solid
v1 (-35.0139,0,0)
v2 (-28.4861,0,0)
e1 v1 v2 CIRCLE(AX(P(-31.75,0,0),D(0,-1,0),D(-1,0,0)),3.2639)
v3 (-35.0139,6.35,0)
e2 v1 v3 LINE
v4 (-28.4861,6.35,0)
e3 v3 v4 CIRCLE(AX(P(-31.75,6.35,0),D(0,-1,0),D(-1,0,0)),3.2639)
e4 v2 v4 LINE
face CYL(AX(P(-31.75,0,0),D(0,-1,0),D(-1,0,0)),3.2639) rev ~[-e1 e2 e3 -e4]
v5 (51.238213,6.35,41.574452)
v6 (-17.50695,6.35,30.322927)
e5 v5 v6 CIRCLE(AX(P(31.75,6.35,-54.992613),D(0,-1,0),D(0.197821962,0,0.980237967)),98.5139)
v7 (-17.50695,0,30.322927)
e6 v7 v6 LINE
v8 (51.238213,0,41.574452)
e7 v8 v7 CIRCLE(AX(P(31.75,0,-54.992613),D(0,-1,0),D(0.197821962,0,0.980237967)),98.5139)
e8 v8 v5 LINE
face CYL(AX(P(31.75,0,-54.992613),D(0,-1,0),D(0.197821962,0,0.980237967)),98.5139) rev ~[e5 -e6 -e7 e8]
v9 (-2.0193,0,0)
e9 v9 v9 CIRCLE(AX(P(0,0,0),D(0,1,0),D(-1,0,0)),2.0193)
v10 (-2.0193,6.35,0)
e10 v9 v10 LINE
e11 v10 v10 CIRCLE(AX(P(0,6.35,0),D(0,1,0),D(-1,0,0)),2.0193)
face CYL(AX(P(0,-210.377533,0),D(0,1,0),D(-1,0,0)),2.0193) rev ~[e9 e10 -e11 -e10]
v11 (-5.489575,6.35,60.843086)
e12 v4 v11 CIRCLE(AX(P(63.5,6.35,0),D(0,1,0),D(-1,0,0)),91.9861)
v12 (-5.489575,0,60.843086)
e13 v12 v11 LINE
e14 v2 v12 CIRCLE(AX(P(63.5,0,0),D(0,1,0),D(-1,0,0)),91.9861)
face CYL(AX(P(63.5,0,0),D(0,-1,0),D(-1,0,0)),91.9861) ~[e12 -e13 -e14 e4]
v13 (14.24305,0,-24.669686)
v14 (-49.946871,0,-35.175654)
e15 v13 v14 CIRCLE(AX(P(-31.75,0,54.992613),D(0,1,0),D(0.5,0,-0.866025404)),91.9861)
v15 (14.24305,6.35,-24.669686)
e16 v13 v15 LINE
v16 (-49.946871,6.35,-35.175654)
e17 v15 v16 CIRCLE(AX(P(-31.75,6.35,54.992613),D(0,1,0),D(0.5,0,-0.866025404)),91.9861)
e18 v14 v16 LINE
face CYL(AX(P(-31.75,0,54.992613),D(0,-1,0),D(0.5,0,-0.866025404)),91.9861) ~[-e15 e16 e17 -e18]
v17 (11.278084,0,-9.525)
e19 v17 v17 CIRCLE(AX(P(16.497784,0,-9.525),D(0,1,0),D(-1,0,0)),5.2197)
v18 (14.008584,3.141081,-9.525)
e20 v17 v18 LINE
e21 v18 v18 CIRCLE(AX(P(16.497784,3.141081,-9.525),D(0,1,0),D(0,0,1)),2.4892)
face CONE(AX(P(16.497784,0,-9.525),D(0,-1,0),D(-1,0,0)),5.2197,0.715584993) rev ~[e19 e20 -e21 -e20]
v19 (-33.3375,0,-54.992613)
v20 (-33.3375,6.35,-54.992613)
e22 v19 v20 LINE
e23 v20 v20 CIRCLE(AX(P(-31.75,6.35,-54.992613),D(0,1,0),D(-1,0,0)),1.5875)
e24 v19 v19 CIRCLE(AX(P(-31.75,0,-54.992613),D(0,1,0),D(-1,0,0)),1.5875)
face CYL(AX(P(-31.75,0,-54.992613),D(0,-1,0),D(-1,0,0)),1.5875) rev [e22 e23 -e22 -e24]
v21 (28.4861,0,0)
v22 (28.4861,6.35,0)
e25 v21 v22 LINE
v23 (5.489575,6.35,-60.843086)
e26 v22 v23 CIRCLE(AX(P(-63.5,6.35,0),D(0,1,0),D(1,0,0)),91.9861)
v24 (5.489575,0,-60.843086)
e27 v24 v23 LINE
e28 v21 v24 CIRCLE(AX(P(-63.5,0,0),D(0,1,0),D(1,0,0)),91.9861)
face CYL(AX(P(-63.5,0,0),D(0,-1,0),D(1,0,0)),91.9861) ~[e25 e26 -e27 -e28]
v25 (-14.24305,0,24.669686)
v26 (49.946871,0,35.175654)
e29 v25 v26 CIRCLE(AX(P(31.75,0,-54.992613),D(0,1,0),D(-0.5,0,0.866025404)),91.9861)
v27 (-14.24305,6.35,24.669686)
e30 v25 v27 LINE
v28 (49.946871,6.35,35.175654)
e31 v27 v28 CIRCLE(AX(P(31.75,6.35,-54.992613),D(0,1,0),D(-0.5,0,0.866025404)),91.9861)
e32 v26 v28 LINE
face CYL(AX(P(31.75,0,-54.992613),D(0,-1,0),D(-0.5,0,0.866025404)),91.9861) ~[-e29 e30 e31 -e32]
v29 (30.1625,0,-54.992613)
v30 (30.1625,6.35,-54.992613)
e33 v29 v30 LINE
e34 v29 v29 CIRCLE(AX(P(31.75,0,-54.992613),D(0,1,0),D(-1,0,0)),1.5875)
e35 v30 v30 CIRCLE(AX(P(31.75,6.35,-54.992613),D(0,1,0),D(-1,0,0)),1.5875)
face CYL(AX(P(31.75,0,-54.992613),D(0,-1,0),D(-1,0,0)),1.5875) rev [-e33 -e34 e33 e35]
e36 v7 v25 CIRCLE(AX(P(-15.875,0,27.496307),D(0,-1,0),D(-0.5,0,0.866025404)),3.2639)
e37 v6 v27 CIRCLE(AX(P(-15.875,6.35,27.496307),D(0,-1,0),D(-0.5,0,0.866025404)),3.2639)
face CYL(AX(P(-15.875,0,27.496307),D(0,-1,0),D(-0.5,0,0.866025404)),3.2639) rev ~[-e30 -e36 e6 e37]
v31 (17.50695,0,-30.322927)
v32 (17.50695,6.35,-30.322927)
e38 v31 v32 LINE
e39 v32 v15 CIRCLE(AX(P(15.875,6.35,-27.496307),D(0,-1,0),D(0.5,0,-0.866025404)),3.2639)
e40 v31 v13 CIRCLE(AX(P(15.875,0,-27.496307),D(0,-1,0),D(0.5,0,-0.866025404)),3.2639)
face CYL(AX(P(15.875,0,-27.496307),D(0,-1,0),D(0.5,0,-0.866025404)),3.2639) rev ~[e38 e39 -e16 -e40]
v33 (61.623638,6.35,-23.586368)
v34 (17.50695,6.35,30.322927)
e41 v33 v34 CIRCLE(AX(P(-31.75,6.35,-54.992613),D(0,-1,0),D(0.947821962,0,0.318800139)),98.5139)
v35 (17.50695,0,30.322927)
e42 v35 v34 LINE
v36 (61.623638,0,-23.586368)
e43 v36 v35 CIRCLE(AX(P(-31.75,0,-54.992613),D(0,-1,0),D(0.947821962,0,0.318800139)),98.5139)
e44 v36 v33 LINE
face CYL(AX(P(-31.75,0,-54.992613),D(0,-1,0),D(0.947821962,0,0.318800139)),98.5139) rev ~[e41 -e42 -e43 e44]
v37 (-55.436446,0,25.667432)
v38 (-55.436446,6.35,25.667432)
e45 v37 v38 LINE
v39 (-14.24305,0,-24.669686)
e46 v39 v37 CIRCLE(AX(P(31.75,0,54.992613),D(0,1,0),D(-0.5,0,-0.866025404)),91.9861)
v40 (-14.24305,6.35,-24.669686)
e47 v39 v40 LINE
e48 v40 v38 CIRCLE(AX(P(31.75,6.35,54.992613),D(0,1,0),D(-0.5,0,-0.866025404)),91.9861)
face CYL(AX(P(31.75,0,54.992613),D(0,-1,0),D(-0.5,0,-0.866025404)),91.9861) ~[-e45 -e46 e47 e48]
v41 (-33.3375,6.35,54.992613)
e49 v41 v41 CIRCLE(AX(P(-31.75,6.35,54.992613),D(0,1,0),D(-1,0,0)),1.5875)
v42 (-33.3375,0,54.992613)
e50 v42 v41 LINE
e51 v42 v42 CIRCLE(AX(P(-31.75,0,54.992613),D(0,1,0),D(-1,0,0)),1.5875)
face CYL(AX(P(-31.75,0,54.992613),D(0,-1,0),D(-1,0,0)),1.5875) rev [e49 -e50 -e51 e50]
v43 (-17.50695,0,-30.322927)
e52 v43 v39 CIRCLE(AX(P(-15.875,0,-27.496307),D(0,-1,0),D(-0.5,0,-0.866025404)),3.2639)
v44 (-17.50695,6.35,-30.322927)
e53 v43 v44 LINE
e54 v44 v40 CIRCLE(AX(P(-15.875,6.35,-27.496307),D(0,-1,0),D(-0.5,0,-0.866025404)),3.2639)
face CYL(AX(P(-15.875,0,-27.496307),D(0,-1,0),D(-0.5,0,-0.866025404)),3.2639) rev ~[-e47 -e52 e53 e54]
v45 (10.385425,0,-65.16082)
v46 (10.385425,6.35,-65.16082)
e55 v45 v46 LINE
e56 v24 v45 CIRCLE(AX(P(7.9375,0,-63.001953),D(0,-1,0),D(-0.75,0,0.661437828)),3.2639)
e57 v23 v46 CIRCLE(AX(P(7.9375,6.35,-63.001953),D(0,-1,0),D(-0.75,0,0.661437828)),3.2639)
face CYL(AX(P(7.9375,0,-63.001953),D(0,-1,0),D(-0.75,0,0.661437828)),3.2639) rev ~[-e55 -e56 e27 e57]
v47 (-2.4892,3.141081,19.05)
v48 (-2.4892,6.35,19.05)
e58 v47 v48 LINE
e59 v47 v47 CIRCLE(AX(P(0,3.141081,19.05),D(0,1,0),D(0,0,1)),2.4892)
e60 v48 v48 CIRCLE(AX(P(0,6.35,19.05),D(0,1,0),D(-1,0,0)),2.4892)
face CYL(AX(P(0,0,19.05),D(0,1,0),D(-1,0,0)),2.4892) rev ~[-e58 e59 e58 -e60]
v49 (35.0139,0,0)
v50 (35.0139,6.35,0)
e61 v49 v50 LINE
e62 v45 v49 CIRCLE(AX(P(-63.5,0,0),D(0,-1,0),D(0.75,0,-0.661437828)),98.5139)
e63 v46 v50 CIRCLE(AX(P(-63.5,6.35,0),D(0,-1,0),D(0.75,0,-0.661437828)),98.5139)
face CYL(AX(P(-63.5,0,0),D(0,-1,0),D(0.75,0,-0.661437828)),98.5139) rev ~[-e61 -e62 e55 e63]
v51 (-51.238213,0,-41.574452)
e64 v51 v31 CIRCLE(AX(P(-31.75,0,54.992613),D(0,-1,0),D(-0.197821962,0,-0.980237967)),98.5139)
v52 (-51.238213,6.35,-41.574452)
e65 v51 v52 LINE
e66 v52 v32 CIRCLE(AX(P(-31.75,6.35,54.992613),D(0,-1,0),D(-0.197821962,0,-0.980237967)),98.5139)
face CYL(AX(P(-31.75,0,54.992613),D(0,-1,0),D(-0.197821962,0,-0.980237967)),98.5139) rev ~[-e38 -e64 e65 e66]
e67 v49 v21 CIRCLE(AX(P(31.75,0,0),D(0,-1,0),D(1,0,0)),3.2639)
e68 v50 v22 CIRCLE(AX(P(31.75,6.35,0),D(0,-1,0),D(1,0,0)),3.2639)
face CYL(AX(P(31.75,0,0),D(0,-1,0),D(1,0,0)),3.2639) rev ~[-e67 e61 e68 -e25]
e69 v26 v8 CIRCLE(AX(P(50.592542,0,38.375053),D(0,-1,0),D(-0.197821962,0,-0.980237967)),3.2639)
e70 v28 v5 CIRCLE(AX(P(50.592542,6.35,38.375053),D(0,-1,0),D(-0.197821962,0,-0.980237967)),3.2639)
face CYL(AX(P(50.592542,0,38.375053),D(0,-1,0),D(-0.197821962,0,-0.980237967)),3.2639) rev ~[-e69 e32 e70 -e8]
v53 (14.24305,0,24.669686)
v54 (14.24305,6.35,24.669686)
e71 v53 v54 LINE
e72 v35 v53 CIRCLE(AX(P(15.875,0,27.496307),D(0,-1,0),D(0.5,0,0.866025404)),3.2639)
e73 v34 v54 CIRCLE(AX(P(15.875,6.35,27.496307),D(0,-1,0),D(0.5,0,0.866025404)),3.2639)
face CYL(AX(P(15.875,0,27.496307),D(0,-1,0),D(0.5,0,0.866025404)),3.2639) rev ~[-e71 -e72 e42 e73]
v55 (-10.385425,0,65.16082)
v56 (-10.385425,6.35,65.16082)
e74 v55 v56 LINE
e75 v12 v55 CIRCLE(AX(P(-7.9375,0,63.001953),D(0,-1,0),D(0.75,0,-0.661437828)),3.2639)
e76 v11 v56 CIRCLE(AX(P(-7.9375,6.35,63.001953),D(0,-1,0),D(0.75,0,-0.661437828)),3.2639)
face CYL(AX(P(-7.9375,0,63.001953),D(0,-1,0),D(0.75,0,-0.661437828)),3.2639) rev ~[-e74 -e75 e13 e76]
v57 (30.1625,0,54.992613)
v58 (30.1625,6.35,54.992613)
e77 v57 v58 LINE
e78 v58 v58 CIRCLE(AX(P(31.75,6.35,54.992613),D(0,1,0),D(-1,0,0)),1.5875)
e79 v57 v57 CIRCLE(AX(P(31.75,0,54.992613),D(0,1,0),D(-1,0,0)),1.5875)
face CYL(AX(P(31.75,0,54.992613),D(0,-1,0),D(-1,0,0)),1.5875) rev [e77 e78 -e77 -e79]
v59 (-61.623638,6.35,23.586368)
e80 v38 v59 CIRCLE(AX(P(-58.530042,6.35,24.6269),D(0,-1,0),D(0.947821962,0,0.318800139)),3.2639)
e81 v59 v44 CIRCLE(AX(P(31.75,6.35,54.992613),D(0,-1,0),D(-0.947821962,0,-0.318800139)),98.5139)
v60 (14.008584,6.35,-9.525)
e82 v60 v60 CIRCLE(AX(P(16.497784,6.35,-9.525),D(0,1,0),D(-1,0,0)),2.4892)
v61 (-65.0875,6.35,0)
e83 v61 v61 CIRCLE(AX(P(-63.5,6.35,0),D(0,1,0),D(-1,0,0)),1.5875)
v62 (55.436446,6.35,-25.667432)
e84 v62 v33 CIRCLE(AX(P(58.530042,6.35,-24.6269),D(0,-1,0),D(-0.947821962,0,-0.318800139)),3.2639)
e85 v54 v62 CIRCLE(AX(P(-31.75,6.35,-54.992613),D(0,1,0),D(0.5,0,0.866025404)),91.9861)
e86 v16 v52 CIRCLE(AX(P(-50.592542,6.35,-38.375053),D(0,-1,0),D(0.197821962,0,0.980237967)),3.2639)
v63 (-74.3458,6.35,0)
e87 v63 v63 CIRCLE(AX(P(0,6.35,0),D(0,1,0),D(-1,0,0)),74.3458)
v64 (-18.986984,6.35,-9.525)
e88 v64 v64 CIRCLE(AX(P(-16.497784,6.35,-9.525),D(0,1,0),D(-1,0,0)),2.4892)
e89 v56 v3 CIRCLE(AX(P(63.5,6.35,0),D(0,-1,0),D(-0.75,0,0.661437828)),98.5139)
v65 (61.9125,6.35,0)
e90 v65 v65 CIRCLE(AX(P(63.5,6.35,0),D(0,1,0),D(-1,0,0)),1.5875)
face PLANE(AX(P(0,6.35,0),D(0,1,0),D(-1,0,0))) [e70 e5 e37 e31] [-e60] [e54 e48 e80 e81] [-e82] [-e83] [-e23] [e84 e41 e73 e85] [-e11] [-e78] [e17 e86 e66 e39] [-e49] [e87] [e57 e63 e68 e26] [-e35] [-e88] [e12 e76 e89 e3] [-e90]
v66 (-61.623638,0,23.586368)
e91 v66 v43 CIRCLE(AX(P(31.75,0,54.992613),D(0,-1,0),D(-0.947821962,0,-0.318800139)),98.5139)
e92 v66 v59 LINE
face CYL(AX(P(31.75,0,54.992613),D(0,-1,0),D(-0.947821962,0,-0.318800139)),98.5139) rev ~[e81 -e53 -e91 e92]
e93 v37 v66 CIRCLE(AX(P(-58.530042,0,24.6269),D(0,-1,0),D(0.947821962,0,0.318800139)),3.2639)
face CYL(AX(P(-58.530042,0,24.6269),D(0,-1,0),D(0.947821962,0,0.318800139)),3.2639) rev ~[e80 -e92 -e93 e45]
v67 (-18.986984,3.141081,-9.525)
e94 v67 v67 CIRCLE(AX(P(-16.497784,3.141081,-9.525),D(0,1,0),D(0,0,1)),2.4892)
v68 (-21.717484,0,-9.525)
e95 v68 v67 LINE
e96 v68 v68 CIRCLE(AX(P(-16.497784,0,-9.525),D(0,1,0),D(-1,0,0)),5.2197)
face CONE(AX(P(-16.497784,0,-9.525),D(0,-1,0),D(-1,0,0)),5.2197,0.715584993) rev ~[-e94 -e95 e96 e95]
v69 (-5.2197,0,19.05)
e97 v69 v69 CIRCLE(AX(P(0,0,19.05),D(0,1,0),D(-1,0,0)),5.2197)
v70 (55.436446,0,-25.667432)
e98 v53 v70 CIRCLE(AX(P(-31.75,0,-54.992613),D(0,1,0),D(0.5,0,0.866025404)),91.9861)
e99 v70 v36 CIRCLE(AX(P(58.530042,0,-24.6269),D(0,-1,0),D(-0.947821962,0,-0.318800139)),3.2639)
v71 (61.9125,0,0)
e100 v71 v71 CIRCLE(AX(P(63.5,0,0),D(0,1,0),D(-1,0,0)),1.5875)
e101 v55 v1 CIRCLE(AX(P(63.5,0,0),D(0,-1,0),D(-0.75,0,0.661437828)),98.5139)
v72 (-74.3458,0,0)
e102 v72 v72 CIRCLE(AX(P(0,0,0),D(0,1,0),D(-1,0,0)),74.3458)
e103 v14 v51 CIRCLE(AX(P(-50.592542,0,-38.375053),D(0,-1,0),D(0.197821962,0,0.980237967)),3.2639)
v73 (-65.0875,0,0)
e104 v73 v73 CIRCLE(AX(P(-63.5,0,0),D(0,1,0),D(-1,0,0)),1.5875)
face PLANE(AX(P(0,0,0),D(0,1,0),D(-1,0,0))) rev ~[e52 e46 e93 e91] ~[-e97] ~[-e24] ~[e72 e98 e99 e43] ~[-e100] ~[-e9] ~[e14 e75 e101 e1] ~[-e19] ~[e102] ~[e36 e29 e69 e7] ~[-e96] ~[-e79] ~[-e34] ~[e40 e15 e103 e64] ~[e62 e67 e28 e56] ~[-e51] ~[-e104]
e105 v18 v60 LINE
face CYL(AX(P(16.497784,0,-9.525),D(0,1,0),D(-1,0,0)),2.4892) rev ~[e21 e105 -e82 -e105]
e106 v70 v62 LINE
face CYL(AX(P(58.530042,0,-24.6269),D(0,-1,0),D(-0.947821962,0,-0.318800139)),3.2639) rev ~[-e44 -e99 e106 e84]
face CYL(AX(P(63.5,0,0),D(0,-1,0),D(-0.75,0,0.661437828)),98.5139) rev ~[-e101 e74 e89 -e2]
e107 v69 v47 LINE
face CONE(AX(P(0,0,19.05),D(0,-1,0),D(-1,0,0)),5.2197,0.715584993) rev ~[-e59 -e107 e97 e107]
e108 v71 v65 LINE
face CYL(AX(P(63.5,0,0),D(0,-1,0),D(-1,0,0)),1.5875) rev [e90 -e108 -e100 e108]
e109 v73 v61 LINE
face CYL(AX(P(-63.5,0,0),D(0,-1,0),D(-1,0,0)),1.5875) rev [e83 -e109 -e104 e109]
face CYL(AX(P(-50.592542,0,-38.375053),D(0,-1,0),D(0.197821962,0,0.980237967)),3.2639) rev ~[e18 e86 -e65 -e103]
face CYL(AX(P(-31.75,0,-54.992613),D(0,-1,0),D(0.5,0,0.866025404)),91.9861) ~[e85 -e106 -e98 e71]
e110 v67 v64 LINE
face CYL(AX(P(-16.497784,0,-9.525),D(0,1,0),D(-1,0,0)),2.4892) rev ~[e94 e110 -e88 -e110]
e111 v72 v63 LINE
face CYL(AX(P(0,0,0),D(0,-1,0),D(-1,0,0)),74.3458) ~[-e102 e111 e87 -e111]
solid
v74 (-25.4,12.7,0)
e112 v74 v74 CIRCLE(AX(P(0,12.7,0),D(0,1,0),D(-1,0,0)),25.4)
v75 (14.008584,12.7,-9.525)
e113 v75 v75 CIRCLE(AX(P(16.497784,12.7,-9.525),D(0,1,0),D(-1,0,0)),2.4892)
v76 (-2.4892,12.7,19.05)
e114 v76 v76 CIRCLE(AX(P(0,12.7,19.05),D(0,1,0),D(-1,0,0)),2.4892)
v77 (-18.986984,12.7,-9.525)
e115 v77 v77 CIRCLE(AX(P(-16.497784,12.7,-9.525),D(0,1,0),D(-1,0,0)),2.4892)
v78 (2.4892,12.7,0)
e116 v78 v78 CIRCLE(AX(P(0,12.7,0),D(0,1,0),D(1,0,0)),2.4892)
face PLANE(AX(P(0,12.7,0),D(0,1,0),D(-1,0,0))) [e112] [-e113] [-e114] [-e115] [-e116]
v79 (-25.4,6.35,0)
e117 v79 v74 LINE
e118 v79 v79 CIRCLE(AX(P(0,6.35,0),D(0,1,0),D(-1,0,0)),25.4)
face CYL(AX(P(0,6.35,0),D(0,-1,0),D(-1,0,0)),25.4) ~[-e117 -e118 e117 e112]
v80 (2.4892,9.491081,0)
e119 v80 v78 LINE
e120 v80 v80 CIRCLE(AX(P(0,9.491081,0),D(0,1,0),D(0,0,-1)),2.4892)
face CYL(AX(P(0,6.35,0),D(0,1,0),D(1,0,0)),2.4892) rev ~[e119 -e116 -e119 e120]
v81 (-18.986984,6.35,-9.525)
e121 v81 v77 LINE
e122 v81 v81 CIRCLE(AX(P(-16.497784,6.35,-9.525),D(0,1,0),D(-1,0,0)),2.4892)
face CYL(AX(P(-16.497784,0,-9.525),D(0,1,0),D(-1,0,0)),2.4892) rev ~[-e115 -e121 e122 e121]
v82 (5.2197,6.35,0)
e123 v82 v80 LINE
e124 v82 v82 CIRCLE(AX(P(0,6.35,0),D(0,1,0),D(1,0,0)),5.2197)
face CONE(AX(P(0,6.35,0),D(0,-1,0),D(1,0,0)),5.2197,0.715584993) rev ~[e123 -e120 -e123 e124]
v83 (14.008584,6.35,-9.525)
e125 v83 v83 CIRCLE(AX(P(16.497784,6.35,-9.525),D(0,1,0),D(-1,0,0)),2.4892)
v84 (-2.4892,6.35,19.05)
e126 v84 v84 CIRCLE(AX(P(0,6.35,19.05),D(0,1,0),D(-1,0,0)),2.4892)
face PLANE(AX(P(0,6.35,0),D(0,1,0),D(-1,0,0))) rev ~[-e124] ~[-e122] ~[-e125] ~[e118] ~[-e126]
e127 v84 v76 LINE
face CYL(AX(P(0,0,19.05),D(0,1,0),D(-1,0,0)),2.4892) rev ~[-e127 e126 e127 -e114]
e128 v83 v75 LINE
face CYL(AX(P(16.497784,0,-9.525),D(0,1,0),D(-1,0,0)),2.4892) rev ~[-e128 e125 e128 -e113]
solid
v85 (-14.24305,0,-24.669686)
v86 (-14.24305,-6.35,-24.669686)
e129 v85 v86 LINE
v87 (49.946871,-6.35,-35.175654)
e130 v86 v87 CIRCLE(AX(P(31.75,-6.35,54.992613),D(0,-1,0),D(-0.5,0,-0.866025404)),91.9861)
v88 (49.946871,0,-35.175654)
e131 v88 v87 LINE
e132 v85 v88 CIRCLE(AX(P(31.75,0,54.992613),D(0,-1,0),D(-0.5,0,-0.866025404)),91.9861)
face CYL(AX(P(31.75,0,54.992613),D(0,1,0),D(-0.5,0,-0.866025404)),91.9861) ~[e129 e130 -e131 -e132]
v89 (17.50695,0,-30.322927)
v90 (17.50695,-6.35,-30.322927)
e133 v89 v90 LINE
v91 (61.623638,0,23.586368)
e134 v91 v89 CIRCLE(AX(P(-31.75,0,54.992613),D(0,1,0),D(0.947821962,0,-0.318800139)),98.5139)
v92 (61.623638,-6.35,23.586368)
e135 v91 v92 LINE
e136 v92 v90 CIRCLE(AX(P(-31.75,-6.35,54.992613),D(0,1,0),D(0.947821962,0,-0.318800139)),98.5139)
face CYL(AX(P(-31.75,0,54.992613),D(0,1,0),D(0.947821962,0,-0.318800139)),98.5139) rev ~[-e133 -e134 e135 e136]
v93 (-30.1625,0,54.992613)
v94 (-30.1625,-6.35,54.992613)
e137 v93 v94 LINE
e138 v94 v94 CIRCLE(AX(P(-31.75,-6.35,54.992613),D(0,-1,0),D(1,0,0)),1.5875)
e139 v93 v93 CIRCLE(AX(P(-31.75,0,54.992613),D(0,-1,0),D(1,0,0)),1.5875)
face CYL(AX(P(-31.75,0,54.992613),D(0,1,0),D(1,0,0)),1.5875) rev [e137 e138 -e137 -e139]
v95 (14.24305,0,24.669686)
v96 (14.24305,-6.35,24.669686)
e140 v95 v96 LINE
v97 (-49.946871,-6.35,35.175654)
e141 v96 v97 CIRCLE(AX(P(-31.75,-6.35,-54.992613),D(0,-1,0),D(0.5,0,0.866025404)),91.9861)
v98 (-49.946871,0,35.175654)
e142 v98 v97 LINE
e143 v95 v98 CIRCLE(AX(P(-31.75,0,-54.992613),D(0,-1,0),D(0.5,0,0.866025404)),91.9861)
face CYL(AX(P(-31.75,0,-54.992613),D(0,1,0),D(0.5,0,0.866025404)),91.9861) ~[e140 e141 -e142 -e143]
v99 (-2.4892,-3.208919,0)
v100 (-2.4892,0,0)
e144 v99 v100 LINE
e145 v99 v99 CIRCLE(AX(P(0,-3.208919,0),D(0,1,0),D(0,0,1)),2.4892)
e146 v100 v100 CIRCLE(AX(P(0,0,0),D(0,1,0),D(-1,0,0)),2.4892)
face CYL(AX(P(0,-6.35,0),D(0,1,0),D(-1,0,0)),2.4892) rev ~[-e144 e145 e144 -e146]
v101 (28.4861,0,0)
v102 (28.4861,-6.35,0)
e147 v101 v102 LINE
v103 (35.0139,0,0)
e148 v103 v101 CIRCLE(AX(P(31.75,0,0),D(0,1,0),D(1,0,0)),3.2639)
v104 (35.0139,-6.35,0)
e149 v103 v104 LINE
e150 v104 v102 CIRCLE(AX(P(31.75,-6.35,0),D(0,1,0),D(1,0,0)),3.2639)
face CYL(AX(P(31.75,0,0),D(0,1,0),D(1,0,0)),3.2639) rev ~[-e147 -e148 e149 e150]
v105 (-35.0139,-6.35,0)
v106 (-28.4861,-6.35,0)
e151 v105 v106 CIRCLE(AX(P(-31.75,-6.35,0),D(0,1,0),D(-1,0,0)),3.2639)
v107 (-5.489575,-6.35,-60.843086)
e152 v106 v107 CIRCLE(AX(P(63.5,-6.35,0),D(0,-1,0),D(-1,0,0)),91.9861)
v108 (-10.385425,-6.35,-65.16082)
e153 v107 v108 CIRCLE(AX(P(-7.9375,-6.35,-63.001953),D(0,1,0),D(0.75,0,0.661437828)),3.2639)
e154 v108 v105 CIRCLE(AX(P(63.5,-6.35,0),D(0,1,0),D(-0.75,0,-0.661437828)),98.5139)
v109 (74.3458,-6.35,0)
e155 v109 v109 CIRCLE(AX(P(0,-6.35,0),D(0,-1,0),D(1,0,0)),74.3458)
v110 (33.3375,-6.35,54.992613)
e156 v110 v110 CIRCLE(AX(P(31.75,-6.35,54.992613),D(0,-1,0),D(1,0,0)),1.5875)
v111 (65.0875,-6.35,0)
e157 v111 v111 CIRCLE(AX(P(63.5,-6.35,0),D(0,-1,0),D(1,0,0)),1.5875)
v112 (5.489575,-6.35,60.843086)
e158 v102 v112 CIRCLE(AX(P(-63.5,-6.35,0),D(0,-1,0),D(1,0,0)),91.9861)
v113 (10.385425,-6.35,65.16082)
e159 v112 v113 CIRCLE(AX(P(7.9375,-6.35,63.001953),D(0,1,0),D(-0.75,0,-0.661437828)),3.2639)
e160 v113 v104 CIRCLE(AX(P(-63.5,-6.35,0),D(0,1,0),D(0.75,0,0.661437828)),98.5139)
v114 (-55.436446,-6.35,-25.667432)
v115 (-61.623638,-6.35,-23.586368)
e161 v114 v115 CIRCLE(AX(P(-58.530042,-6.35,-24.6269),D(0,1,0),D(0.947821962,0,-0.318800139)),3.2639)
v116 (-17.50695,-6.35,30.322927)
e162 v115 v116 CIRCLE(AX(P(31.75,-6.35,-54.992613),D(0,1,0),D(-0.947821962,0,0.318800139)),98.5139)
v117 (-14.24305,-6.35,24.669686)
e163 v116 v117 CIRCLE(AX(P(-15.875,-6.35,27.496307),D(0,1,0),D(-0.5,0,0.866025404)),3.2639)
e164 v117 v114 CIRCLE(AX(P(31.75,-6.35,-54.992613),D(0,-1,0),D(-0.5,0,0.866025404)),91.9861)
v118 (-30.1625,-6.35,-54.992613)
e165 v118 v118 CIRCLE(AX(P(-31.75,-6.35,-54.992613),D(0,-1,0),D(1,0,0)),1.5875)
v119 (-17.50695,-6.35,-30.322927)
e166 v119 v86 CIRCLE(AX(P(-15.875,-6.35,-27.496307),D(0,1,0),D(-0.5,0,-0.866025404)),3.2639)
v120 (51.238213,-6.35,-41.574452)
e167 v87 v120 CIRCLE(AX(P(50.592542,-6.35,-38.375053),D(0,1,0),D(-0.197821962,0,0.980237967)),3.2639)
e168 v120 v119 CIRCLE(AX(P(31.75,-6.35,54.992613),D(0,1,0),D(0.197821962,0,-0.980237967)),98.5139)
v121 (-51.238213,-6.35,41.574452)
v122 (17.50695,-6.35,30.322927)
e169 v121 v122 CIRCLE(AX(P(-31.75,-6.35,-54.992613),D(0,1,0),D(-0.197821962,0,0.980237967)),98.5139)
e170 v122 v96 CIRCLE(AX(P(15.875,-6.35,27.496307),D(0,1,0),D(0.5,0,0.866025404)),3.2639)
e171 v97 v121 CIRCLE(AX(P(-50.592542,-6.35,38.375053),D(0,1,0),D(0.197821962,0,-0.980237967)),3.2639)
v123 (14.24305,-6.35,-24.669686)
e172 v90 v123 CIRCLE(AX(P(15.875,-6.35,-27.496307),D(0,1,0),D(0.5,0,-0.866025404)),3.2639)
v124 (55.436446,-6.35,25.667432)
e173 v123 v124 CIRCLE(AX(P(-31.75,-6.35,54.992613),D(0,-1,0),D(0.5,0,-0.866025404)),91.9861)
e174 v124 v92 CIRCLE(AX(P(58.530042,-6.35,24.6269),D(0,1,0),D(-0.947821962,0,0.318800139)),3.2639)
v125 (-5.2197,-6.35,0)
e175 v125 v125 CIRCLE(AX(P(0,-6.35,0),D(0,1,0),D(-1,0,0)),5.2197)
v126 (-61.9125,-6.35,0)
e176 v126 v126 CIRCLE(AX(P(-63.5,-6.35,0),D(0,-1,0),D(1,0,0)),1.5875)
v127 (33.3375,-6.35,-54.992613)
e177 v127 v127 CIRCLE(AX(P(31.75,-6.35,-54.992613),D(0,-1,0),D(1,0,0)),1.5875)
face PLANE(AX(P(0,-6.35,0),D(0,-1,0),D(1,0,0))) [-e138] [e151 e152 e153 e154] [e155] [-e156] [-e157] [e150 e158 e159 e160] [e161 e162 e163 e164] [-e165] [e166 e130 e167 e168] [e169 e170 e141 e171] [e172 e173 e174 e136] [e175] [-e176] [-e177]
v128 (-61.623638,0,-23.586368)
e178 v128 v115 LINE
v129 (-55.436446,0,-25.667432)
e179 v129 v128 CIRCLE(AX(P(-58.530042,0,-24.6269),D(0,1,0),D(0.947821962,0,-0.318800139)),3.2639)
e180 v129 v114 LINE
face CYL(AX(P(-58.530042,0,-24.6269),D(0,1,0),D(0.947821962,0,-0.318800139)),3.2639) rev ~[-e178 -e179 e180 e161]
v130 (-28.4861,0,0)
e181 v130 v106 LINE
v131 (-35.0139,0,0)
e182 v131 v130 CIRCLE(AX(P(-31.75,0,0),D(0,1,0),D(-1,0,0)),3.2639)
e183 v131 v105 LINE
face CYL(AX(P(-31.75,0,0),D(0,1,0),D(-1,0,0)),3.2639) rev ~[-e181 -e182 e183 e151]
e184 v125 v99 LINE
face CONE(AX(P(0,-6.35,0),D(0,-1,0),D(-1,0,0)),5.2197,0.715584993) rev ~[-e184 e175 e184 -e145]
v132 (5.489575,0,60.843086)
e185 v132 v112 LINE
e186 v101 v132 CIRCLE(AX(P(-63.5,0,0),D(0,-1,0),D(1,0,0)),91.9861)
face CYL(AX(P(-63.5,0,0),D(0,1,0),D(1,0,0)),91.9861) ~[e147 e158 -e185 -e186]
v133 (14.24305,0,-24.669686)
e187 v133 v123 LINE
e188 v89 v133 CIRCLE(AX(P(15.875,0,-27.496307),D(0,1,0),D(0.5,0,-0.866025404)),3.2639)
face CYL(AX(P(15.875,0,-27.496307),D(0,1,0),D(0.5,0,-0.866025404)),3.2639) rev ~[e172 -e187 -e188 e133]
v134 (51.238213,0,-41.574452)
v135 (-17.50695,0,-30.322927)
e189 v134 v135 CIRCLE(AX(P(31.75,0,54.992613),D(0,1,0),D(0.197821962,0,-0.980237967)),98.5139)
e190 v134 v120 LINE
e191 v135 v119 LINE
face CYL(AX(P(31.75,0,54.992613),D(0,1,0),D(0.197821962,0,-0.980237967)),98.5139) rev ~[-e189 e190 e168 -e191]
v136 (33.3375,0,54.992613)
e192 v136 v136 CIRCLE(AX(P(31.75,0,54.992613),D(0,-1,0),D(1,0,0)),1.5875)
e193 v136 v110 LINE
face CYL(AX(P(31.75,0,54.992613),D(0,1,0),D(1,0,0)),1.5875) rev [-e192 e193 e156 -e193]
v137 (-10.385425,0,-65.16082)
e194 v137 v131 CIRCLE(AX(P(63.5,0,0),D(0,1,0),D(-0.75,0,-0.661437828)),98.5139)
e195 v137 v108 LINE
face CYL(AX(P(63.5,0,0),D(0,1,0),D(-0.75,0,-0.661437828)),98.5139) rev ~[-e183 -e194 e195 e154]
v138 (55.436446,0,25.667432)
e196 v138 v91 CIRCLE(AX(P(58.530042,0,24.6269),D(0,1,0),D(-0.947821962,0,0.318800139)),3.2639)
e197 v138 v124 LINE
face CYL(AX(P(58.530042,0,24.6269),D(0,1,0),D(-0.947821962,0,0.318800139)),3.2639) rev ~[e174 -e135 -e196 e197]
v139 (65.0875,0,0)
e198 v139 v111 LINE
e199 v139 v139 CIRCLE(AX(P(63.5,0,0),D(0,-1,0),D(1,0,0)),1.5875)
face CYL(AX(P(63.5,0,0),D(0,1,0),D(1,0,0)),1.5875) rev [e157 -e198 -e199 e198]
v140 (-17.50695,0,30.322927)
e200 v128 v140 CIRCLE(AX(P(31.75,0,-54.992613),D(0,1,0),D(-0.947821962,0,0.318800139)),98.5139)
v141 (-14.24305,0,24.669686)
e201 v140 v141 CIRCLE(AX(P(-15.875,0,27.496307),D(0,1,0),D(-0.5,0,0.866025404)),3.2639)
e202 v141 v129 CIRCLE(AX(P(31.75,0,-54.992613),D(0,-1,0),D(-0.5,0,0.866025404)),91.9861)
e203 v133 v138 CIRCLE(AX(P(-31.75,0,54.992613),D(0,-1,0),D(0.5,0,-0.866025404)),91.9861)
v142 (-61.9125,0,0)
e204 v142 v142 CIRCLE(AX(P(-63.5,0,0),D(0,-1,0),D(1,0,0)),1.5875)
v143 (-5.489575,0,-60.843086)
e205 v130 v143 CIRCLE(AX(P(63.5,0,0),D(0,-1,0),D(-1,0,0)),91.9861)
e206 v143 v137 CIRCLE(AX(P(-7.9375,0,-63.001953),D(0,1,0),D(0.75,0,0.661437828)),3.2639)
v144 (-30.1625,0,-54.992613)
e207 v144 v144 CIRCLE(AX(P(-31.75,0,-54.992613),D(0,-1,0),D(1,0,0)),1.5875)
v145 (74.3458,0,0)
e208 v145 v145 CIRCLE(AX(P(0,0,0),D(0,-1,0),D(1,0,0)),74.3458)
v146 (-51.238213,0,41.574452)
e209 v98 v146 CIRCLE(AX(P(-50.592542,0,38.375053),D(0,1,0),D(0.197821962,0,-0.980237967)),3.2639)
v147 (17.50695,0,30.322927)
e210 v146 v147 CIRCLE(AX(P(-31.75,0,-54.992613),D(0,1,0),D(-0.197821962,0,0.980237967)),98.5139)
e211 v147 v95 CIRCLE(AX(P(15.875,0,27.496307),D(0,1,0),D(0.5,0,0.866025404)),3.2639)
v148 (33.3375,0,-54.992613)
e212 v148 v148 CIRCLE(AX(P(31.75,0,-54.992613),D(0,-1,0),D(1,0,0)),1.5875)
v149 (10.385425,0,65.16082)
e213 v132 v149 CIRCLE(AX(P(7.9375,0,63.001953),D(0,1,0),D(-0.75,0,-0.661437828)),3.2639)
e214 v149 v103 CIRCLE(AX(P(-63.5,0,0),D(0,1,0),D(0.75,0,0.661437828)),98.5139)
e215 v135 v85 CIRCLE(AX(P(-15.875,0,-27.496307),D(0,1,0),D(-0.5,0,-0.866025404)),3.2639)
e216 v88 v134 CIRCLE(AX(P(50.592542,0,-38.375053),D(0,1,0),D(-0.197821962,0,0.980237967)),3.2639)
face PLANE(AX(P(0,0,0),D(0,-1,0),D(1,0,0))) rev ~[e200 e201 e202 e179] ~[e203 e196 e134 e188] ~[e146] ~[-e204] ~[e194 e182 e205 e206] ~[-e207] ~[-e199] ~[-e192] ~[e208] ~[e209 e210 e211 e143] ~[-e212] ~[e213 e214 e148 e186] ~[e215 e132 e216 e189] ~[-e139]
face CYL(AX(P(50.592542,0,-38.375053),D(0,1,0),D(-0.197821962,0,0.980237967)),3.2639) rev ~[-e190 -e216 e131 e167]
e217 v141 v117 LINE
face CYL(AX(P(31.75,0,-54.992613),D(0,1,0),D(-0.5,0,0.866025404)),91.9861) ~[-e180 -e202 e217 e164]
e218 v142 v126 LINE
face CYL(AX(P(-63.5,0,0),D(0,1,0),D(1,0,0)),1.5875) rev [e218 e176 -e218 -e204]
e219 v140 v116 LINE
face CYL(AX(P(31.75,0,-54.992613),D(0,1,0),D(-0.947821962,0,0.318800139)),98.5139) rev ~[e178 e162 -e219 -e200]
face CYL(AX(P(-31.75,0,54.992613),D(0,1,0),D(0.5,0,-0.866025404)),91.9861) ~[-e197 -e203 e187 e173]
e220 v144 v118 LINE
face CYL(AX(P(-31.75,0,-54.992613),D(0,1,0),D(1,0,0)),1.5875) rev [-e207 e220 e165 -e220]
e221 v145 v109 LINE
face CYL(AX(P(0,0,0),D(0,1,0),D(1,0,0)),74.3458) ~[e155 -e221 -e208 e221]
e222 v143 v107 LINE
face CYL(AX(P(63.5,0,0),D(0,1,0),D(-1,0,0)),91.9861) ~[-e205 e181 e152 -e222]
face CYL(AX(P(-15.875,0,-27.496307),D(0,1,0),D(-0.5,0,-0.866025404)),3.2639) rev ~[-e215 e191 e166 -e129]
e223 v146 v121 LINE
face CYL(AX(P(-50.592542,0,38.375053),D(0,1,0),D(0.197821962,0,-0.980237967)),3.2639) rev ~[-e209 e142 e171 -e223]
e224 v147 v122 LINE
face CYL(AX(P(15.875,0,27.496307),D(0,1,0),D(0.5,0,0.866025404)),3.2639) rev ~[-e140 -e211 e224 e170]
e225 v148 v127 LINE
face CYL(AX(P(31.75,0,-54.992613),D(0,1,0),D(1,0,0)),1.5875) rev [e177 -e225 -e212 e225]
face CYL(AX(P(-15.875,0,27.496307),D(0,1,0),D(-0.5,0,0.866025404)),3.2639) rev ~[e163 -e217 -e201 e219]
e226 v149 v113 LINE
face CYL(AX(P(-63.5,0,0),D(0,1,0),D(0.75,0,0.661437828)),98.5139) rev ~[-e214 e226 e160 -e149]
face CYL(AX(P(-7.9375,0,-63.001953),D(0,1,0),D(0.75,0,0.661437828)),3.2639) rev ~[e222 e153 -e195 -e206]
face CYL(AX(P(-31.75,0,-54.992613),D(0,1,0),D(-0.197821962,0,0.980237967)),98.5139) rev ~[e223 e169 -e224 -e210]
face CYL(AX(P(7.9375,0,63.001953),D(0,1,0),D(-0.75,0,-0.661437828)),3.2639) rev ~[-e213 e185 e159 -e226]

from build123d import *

# Parameters (mm, degrees)
F0_R              = 74.3458
F0_R_2            = 1.5875
F1_DEPTH          = 6.35
F2_DEPTH          = 6.35
F3_ANGLE          = 180
F5_D              = 4.9784
F5_CSINK_D        = 10.4394
F5_CSINK_ANGLE    = 82
F6_D              = 4.0386
F7_R              = 25.4
F8_DEPTH          = 6.35
F9_D              = 4.9784
F9_CSINK_D        = 10.4394
F9_CSINK_ANGLE    = 82
F11_D             = 4.9784
F11_CSINK_D       = 10.4394
F11_CSINK_ANGLE   = 82
F11_2_D           = 4.9784
F11_2_CSINK_D     = 10.4394
F11_2_CSINK_ANGLE = 82


# Not quite as in the source:
# - a feature names something its author has since deleted; it is built from what else it names


with BuildPart() as f1:
    # F0 (on Front) → F1 (new body)
    with BuildSketch(Plane.XZ):
        Circle(F0_R)
        with Locations((-31.75, -54.9926131403)):
            Circle(F0_R_2, mode=Mode.SUBTRACT)
        with BuildLine():
            ThreePointArc((-5.489575, -60.8430861687), (-5.778633074, -65.4498780947), (-10.385425, -65.1608200208))
            ThreePointArc((-10.385425, -65.1608200208), (-28.6513154087, -34.8299233656), (-35.0139, 0))
            ThreePointArc((-35.0139, 0), (-31.75, 3.2639), (-28.4861, 0))
            ThreePointArc((-28.4861, 0), (-22.5451176364, -32.5219975425), (-5.489575, -60.8430861687))
        make_face(mode=Mode.SUBTRACT)
        with Locations((31.75, -54.9926131403)):
            Circle(F0_R_2, mode=Mode.SUBTRACT)
        with BuildLine():
            ThreePointArc((49.9468707667, -35.1756544903), (53.7919405676, -37.7293820886), (51.2382129694, -41.5744518895))
            ThreePointArc((51.2382129694, -41.5744518895), (15.8379407421, -42.2277286786), (-17.50695, -30.3229268856))
            ThreePointArc((-17.50695, -30.3229268856), (-18.7016203154, -25.8643565702), (-14.24305, -24.6696862547))
            ThreePointArc((-14.24305, -24.6696862547), (16.8923172354, -35.7856433756), (49.9468707667, -35.1756544903))
        make_face(mode=Mode.SUBTRACT)
        with BuildLine():
            ThreePointArc((14.24305, -24.6696862547), (39.4374348718, -3.2636458332), (55.4364457667, 25.6674316784))
            ThreePointArc((55.4364457667, 25.6674316784), (59.5705736416, 27.7204960062), (61.6236379694, 23.5863681313))
            ThreePointArc((61.6236379694, 23.5863681313), (44.4892561508, -7.397805313), (17.50695, -30.3229268856))
            ThreePointArc((17.50695, -30.3229268856), (13.0483796846, -29.1282565702), (14.24305, -24.6696862547))
        make_face(mode=Mode.SUBTRACT)
        with Locations((-63.5, 0)):
            Circle(F0_R_2, mode=Mode.SUBTRACT)
        with BuildLine():
            ThreePointArc((-55.4364457667, -25.6674316784), (-59.5705736416, -27.7204960062), (-61.6236379694, -23.5863681313))
            ThreePointArc((-61.6236379694, -23.5863681313), (-44.4892561508, 7.397805313), (-17.50695, 30.3229268856))
            ThreePointArc((-17.50695, 30.3229268856), (-13.0483796846, 29.1282565702), (-14.24305, 24.6696862547))
            ThreePointArc((-14.24305, 24.6696862547), (-39.4374348718, 3.2636458332), (-55.4364457667, -25.6674316784))
        make_face(mode=Mode.SUBTRACT)
        with BuildLine():
            ThreePointArc((-49.9468707667, 35.1756544903), (-53.7919405676, 37.7293820886), (-51.2382129694, 41.5744518895))
            ThreePointArc((-51.2382129694, 41.5744518895), (-15.8379407421, 42.2277286786), (17.50695, 30.3229268856))
            ThreePointArc((17.50695, 30.3229268856), (18.7016203154, 25.8643565702), (14.24305, 24.6696862547))
            ThreePointArc((14.24305, 24.6696862547), (-16.8923172354, 35.7856433756), (-49.9468707667, 35.1756544903))
        make_face(mode=Mode.SUBTRACT)
        with Locations((-31.75, 54.9926131403)):
            Circle(F0_R_2, mode=Mode.SUBTRACT)
        with BuildLine():
            ThreePointArc((5.489575, 60.8430861687), (5.778633074, 65.4498780947), (10.385425, 65.1608200208))
            ThreePointArc((10.385425, 65.1608200208), (28.6513154087, 34.8299233656), (35.0139, 0))
            ThreePointArc((35.0139, 0), (31.75, -3.2639), (28.4861, 0))
            ThreePointArc((28.4861, 0), (22.5451176364, 32.5219975425), (5.489575, 60.8430861687))
        make_face(mode=Mode.SUBTRACT)
        with Locations((63.5, 0)):
            Circle(F0_R_2, mode=Mode.SUBTRACT)
        with Locations((31.75, 54.9926131403)):
            Circle(F0_R_2, mode=Mode.SUBTRACT)
    extrude(amount=F1_DEPTH)

    # F5 (through all)
    with Locations(Plane.XZ.offset(6.35)):
        with Locations((0, 0)):
            CounterSinkHole(F5_D / 2, F5_CSINK_D / 2, counter_sink_angle=F5_CSINK_ANGLE)


with BuildPart() as f2:
    # F0 (on Front) → F2 (new body, through all)
    with BuildSketch(Plane.XZ):
        Circle(F0_R)
        with Locations((-31.75, -54.9926131403)):
            Circle(F0_R_2, mode=Mode.SUBTRACT)
        with BuildLine():
            ThreePointArc((-5.489575, -60.8430861687), (-5.778633074, -65.4498780947), (-10.385425, -65.1608200208))
            ThreePointArc((-10.385425, -65.1608200208), (-28.6513154087, -34.8299233656), (-35.0139, 0))
            ThreePointArc((-35.0139, 0), (-31.75, 3.2639), (-28.4861, 0))
            ThreePointArc((-28.4861, 0), (-22.5451176364, -32.5219975425), (-5.489575, -60.8430861687))
        make_face(mode=Mode.SUBTRACT)
        with Locations((31.75, -54.9926131403)):
            Circle(F0_R_2, mode=Mode.SUBTRACT)
        with BuildLine():
            ThreePointArc((49.9468707667, -35.1756544903), (53.7919405676, -37.7293820886), (51.2382129694, -41.5744518895))
            ThreePointArc((51.2382129694, -41.5744518895), (15.8379407421, -42.2277286786), (-17.50695, -30.3229268856))
            ThreePointArc((-17.50695, -30.3229268856), (-18.7016203154, -25.8643565702), (-14.24305, -24.6696862547))
            ThreePointArc((-14.24305, -24.6696862547), (16.8923172354, -35.7856433756), (49.9468707667, -35.1756544903))
        make_face(mode=Mode.SUBTRACT)
        with BuildLine():
            ThreePointArc((14.24305, -24.6696862547), (39.4374348718, -3.2636458332), (55.4364457667, 25.6674316784))
            ThreePointArc((55.4364457667, 25.6674316784), (59.5705736416, 27.7204960062), (61.6236379694, 23.5863681313))
            ThreePointArc((61.6236379694, 23.5863681313), (44.4892561508, -7.397805313), (17.50695, -30.3229268856))
            ThreePointArc((17.50695, -30.3229268856), (13.0483796846, -29.1282565702), (14.24305, -24.6696862547))
        make_face(mode=Mode.SUBTRACT)
        with Locations((-63.5, 0)):
            Circle(F0_R_2, mode=Mode.SUBTRACT)
        with BuildLine():
            ThreePointArc((-55.4364457667, -25.6674316784), (-59.5705736416, -27.7204960062), (-61.6236379694, -23.5863681313))
            ThreePointArc((-61.6236379694, -23.5863681313), (-44.4892561508, 7.397805313), (-17.50695, 30.3229268856))
            ThreePointArc((-17.50695, 30.3229268856), (-13.0483796846, 29.1282565702), (-14.24305, 24.6696862547))
            ThreePointArc((-14.24305, 24.6696862547), (-39.4374348718, 3.2636458332), (-55.4364457667, -25.6674316784))
        make_face(mode=Mode.SUBTRACT)
        with BuildLine():
            ThreePointArc((-49.9468707667, 35.1756544903), (-53.7919405676, 37.7293820886), (-51.2382129694, 41.5744518895))
            ThreePointArc((-51.2382129694, 41.5744518895), (-15.8379407421, 42.2277286786), (17.50695, 30.3229268856))
            ThreePointArc((17.50695, 30.3229268856), (18.7016203154, 25.8643565702), (14.24305, 24.6696862547))
            ThreePointArc((14.24305, 24.6696862547), (-16.8923172354, 35.7856433756), (-49.9468707667, 35.1756544903))
        make_face(mode=Mode.SUBTRACT)
        with Locations((-31.75, 54.9926131403)):
            Circle(F0_R_2, mode=Mode.SUBTRACT)
        with BuildLine():
            ThreePointArc((5.489575, 60.8430861687), (5.778633074, 65.4498780947), (10.385425, 65.1608200208))
            ThreePointArc((10.385425, 65.1608200208), (28.6513154087, 34.8299233656), (35.0139, 0))
            ThreePointArc((35.0139, 0), (31.75, -3.2639), (28.4861, 0))
            ThreePointArc((28.4861, 0), (22.5451176364, 32.5219975425), (5.489575, 60.8430861687))
        make_face(mode=Mode.SUBTRACT)
        with Locations((63.5, 0)):
            Circle(F0_R_2, mode=Mode.SUBTRACT)
        with Locations((31.75, 54.9926131403)):
            Circle(F0_R_2, mode=Mode.SUBTRACT)
    extrude(amount=F2_DEPTH)


with BuildPart() as f2_1:
    # F3: moved
    add(f2.part.rotate(Axis((0, 0, 37.1729), (0, 0, 1)), F3_ANGLE))

    # F6 (through all)
    with Locations(Plane.XZ):
        with Locations((0, 0)):
            Hole(F6_D / 2)

    # F11 (through all)
    with Locations(Plane.XZ):
        with Locations((0, 19.05), (16.4977839421, -9.525), (-16.4977839421, -9.525)):
            CounterSinkHole(F11_D / 2, F11_CSINK_D / 2, counter_sink_angle=F11_CSINK_ANGLE)


with BuildPart() as f8:
    # F7 (on face) → F8 (new body)
    with BuildSketch(Plane(origin=(0, 6.35, 0), x_dir=(-1, 0, 0), z_dir=(0, 1, 0))):
        Circle(F7_R)
    extrude(amount=F8_DEPTH)

    # F9 (through all)
    with Locations(Plane(origin=(0, 6.35, 0), x_dir=(-1, 0, 0), z_dir=(0, -1, 0))):
        with Locations((0, 0)):
            CounterSinkHole(F9_D / 2, F9_CSINK_D / 2, counter_sink_angle=F9_CSINK_ANGLE)

    # F11#2 (through all)
    with Locations(Plane.XZ):
        with Locations((0, 19.05), (16.4977839421, -9.525), (-16.4977839421, -9.525)):
            CounterSinkHole(F11_2_D / 2, F11_2_CSINK_D / 2, counter_sink_angle=F11_2_CSINK_ANGLE)


solid = Compound([f1.part, f2_1.part, f8.part])
